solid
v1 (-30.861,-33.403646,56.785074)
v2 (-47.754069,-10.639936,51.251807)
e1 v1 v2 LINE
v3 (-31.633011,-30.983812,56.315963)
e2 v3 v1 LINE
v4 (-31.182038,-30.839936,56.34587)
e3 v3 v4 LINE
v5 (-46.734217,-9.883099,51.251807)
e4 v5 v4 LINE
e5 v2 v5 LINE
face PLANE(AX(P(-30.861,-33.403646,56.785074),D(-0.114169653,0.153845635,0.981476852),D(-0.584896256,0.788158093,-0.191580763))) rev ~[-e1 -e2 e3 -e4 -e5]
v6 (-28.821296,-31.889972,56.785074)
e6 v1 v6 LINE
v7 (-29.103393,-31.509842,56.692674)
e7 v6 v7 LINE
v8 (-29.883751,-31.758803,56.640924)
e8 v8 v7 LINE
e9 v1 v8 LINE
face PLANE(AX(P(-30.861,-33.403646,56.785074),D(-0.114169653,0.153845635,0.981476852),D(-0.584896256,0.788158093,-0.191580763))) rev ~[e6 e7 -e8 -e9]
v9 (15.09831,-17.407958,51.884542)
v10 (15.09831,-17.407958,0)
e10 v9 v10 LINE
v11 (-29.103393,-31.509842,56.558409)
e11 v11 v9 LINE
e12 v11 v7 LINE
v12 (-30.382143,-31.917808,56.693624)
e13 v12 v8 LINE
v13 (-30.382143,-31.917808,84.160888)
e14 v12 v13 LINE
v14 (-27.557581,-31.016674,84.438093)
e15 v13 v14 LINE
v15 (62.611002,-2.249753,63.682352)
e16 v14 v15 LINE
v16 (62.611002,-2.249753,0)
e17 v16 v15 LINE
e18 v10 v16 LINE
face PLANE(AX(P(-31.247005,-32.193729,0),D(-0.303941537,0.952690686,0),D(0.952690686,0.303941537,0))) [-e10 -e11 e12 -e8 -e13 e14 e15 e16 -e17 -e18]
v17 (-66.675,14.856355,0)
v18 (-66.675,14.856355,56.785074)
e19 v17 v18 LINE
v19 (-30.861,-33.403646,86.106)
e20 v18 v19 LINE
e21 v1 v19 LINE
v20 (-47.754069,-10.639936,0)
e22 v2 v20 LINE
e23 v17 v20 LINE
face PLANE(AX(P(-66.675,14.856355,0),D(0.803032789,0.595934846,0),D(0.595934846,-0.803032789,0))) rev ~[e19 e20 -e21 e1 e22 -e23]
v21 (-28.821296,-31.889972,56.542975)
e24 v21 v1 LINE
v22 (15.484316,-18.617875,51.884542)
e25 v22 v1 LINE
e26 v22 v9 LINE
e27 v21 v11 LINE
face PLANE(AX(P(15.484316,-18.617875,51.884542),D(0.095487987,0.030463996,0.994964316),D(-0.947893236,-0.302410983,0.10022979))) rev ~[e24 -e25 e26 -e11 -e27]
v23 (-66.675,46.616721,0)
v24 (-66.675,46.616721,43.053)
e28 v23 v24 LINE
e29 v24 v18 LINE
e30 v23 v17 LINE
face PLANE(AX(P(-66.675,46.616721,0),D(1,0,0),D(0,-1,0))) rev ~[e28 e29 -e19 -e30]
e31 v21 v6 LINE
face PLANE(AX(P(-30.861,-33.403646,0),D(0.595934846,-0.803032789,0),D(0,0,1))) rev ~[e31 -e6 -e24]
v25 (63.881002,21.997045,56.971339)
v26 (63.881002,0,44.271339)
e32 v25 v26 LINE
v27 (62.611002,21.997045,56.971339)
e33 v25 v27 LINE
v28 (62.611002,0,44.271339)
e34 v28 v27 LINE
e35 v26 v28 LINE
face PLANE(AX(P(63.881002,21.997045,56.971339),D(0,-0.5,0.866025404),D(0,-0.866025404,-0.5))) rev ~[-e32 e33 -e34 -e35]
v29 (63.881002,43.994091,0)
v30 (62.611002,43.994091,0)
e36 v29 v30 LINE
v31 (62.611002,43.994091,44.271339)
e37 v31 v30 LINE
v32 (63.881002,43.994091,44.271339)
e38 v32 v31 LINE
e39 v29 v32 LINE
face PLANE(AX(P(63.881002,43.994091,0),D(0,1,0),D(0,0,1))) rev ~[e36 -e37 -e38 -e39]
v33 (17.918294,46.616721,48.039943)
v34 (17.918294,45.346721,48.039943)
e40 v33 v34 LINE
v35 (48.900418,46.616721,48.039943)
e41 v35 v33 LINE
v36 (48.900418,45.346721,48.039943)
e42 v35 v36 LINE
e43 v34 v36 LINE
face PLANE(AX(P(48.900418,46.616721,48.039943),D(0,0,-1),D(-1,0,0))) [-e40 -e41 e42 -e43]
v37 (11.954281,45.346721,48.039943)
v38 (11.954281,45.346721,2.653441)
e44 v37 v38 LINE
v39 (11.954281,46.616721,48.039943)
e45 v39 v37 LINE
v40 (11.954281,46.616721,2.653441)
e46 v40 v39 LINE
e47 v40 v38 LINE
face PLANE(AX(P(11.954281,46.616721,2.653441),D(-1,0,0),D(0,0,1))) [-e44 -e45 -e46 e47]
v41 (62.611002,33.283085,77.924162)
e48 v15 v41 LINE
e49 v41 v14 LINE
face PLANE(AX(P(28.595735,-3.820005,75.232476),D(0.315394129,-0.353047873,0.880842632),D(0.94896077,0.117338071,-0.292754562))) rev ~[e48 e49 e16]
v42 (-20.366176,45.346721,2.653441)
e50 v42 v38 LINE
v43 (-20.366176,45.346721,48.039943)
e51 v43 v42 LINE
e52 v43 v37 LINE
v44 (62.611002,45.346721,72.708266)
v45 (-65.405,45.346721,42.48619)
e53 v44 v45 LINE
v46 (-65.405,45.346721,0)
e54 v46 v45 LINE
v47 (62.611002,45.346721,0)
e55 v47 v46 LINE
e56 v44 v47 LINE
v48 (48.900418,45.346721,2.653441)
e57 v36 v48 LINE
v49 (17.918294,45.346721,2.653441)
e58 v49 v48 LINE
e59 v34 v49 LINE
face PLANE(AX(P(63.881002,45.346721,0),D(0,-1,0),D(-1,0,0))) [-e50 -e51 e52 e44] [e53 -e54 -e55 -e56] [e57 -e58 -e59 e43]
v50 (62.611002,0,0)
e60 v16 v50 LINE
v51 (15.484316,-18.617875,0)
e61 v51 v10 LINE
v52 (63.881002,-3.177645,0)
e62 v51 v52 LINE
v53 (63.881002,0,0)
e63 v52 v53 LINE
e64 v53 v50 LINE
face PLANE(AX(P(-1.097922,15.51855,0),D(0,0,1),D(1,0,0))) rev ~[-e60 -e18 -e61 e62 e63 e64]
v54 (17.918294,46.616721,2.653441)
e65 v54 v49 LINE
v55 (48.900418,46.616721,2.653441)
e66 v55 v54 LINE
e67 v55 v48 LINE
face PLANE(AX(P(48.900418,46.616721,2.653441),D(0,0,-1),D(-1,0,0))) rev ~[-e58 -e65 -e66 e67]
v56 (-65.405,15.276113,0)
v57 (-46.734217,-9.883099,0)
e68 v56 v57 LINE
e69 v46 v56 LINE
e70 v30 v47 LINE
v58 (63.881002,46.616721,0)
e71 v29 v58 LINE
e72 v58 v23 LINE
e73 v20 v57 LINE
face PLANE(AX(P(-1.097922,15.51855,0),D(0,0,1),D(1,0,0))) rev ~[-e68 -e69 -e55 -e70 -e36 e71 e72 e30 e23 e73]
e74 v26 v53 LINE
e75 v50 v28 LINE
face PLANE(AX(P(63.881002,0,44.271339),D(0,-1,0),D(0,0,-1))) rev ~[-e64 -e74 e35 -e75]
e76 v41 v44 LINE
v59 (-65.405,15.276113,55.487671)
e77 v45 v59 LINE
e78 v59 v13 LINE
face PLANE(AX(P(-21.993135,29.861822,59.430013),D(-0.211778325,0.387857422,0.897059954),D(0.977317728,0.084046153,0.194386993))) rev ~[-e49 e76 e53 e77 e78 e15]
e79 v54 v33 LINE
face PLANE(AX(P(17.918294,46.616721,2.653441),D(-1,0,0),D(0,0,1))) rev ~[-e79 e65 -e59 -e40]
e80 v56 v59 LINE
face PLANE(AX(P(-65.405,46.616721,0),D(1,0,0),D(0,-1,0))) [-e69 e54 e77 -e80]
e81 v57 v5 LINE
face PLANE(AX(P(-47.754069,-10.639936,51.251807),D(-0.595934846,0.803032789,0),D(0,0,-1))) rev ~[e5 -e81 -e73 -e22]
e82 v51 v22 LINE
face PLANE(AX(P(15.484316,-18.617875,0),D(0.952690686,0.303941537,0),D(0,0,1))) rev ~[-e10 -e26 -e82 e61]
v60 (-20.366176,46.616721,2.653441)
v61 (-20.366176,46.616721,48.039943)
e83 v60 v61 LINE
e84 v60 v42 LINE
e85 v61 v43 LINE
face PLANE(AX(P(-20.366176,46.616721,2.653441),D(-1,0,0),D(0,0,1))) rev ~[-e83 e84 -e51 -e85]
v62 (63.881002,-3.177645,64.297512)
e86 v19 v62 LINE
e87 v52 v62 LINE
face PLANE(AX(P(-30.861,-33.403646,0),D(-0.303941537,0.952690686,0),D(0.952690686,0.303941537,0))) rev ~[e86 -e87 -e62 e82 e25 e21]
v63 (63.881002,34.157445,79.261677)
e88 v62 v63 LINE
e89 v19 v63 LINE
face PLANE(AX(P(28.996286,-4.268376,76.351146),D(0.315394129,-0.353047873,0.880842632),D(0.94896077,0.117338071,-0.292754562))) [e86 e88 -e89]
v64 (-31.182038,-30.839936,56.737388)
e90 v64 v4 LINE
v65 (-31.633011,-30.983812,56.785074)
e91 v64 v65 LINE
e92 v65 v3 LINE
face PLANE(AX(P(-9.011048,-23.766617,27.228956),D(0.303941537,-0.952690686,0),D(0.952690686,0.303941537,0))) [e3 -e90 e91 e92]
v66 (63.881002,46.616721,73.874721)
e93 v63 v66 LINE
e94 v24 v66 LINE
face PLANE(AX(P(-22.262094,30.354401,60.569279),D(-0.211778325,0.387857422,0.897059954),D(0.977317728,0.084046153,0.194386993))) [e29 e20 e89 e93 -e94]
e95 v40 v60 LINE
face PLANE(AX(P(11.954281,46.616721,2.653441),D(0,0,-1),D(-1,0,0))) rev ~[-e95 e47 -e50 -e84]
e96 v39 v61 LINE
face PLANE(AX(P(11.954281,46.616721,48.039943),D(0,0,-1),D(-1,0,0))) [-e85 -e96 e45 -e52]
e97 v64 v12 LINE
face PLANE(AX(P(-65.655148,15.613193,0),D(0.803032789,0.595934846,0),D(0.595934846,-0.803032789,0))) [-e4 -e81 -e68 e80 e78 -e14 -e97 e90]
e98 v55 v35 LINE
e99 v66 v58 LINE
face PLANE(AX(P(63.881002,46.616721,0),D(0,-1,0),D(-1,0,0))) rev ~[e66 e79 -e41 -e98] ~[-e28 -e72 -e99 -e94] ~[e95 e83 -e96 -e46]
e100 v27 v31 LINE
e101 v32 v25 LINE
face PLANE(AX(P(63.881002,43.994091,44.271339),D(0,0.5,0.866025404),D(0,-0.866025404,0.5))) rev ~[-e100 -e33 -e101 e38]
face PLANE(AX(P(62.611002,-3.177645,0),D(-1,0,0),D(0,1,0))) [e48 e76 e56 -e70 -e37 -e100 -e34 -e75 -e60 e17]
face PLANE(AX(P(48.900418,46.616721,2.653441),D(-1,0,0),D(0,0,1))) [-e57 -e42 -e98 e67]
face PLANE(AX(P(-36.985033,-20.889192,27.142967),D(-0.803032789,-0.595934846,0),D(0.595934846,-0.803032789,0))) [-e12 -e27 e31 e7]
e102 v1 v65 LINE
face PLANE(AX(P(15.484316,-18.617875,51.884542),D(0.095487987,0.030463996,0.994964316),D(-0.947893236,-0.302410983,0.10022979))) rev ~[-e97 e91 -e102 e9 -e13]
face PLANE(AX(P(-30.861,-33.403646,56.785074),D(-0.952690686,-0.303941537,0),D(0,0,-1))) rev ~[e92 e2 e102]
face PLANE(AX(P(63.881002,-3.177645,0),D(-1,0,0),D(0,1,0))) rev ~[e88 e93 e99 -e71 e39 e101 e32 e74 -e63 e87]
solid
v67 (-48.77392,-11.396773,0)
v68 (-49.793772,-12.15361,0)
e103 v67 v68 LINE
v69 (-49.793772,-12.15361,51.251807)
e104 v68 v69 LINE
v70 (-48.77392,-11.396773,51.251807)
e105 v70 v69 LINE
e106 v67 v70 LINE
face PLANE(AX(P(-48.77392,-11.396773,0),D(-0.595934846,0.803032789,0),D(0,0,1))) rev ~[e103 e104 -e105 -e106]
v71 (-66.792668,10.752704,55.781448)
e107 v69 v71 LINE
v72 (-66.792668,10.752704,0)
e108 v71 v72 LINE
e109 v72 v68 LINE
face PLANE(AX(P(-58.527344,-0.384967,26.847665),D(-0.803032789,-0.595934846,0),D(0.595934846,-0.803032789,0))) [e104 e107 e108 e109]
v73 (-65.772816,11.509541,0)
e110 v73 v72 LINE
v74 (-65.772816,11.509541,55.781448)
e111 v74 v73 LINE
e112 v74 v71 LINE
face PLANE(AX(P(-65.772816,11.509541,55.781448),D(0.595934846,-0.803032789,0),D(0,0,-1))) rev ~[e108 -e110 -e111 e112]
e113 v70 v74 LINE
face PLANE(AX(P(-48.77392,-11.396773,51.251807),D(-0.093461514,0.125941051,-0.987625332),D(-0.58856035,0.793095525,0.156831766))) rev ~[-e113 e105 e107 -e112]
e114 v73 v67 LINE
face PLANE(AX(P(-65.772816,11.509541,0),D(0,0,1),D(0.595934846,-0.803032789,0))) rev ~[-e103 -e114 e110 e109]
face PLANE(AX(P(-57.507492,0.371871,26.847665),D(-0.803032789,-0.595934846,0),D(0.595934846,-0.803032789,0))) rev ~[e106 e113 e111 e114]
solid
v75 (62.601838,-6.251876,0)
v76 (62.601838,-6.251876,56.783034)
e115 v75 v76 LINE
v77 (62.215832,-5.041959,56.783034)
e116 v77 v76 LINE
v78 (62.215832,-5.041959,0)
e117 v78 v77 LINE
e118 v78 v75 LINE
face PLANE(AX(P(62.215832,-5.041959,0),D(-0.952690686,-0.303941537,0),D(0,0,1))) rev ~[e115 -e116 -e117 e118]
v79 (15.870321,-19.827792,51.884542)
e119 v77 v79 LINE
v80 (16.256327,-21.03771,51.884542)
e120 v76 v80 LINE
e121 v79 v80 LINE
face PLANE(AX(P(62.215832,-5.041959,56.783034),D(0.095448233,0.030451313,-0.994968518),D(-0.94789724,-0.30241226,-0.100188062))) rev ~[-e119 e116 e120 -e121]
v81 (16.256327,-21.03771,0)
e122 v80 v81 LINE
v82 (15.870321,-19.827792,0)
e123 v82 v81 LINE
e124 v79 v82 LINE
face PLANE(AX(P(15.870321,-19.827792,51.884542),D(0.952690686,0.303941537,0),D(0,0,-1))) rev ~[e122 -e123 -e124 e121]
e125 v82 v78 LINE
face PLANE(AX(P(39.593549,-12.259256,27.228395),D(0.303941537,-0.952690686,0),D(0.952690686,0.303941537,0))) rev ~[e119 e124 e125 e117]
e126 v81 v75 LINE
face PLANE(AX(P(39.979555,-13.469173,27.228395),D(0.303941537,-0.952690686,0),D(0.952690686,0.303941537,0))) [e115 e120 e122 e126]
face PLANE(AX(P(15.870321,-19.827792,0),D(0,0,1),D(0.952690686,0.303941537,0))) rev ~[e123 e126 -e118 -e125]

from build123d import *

# Parameters (mm, degrees)
F1_DEPTH  = 86.106
F6_W      = 240.2444779873
F6_H      = 147.931613028
F7_DEPTH  = 60.706
F10_W     = 135.2960467339
F10_H     = 94.6298297495
F11_DEPTH = 41.148
F13_T     = -1.27
F14_DEPTH = 2.54
F16_DEPTH = 2.54
F18_DEPTH = 2.54
F19_W     = 30.9821236879
F19_H     = 45.3865022864
F19_W_2   = 32.3204575107
F20_DEPTH = 2.54
F23_START = 1.27
F23_DEPTH = 1.27
F25_START = 1.27
F25_DEPTH = 1.27


# Not quite as in the source:
# - the program builds the solid bodies; features that only make, move or delete a surface that nothing else refers to are left out


with BuildPart() as f1:
    # F0 (on Top) → F1 (new body)
    with BuildSketch(Plane.XY):
        Polygon((63.8810023665, 46.616720651), (-66.6749998927, 46.616720651), (-66.6749998927, 14.8563552648), (-30.8609995991, -33.4036462009), (63.8810023665, -3.1776451506), align=None)
    extrude(amount=F1_DEPTH)

    # F6 (on 3pt) + F3 (on face) → F7 (cut)
    with BuildSketch(Plane(origin=(-14.9985821509, 27.4688705788, 63.5316546184), x_dir=(0.9773177277, 0.084046153, 0.1943869934), z_dir=(-0.2117783252, 0.387857422, 0.897059954))):
        with Locations((-7.4320882559, 3.8242153823)):
            Rectangle(F6_W, F6_H)
    with BuildSketch(Plane(origin=(0, 46.616720651, 0), x_dir=(-1, 0, 0), z_dir=(0, 1, 0))):
        Polygon((-63.8810023665, 86.106), (-63.8810023665, 62.2684090482), (-14.7184757516, 62.2684090482), (66.6749998927, 62.2684090482), (66.6749998927, 86.106), align=None)
    extrude(amount=F7_DEPTH, dir=(-0.2117783252, 0.387857422, 0.897059954), mode=Mode.SUBTRACT)

    # F10 (on 3pt) → F11 (cut)
    with BuildSketch(Plane(origin=(24.5709511473, -27.5043865165, 68.6225243158), x_dir=(0.9489607702, 0.1173380711, -0.2927545622), z_dir=(0.315394129, -0.3530478726, 0.8808426324))):
        with Locations((4.6633481979, 24.4434149936)):
            Rectangle(F10_W, F10_H)
    extrude(amount=F11_DEPTH, mode=Mode.SUBTRACT)

    # F13
    f13_openings = [f1.faces().sort_by_distance(p)[0] for p in [
        (-1.661142, 14.401339, 0),
    ]]
    offset(amount=F13_T, openings=f13_openings)

    # F12 (on face) → F14 (cut)
    with BuildSketch(Plane(origin=(-35.8865647103, -26.6316079577, 0), x_dir=(0.5959348457, -0.8030327886, 0), z_dir=(-0.8030327886, -0.5959348457, 0))):
        Polygon((-19.9140961726, 51.251806932), (-19.9140961726, 0), (8.4330781245, 0), (8.4330781245, 56.7850737445), align=None)
    extrude(amount=-F14_DEPTH, mode=Mode.SUBTRACT)

    # F15 (on face) → F16 (cut)
    with BuildSketch(Plane(origin=(6.8214823825, -21.38162095, 0), x_dir=(0.9526906855, 0.3039415366, 0), z_dir=(0.3039415366, -0.9526906855, 0))):
        Polygon((9.0930175873, 51.884541691), (-39.55374242, 56.7850737445), (-39.55374242, 0), (9.0930175873, 0), align=None)
    extrude(amount=-F16_DEPTH, mode=Mode.SUBTRACT)

    # F17 (on face) → F18 (cut)
    with BuildSketch(Plane.YZ.offset(63.8810023665)):
        Polygon((0, 44.2713387311), (0, 0), (43.9940905122, 0), (43.9940905122, 44.2713387311), (21.9970452561, 56.9713387311), align=None)
    extrude(amount=-F18_DEPTH, mode=Mode.SUBTRACT)

    # F19 (on face) → F20 (cut)
    with BuildSketch(Plane(origin=(0, 46.616720651, 0), x_dir=(-1, 0, 0), z_dir=(0, 1, 0))):
        with Locations((-33.4093561396, 25.3466918366)):
            Rectangle(F19_W, F19_H)
        with Locations((4.2059472762, 25.3466918366)):
            Rectangle(F19_W_2, F19_H)
    extrude(amount=-F20_DEPTH, mode=Mode.SUBTRACT)


with BuildPart() as f23:
    # F22 (on face) → F23 (new body)
    with BuildSketch(Plane(origin=(6.8214823825, -21.38162095, 0), x_dir=(0.9526906855, 0.3039415366, 0), z_dir=(0.3039415366, -0.9526906855, 0)).offset(F23_START)):
        Polygon((57.7399830757, 56.7830335389), (9.0930175873, 51.884541691), (9.0930175873, 0), (57.7399830757, 0), align=None)
    extrude(amount=F23_DEPTH)


with BuildPart() as f25:
    # F24 (on face) → F25 (new body)
    with BuildSketch(Plane(origin=(-35.8865647103, -26.6316079577, 0), x_dir=(0.5959348457, -0.8030327886, 0), z_dir=(-0.8030327886, -0.5959348457, 0)).offset(F25_START)):
        Polygon((-19.9140961726, 0), (-19.9140961726, 51.251806932), (-48.4388518792, 55.7814475499), (-48.4388518792, 0), align=None)
    extrude(amount=F25_DEPTH)


solid = Compound([f1.part, f23.part, f25.part])
